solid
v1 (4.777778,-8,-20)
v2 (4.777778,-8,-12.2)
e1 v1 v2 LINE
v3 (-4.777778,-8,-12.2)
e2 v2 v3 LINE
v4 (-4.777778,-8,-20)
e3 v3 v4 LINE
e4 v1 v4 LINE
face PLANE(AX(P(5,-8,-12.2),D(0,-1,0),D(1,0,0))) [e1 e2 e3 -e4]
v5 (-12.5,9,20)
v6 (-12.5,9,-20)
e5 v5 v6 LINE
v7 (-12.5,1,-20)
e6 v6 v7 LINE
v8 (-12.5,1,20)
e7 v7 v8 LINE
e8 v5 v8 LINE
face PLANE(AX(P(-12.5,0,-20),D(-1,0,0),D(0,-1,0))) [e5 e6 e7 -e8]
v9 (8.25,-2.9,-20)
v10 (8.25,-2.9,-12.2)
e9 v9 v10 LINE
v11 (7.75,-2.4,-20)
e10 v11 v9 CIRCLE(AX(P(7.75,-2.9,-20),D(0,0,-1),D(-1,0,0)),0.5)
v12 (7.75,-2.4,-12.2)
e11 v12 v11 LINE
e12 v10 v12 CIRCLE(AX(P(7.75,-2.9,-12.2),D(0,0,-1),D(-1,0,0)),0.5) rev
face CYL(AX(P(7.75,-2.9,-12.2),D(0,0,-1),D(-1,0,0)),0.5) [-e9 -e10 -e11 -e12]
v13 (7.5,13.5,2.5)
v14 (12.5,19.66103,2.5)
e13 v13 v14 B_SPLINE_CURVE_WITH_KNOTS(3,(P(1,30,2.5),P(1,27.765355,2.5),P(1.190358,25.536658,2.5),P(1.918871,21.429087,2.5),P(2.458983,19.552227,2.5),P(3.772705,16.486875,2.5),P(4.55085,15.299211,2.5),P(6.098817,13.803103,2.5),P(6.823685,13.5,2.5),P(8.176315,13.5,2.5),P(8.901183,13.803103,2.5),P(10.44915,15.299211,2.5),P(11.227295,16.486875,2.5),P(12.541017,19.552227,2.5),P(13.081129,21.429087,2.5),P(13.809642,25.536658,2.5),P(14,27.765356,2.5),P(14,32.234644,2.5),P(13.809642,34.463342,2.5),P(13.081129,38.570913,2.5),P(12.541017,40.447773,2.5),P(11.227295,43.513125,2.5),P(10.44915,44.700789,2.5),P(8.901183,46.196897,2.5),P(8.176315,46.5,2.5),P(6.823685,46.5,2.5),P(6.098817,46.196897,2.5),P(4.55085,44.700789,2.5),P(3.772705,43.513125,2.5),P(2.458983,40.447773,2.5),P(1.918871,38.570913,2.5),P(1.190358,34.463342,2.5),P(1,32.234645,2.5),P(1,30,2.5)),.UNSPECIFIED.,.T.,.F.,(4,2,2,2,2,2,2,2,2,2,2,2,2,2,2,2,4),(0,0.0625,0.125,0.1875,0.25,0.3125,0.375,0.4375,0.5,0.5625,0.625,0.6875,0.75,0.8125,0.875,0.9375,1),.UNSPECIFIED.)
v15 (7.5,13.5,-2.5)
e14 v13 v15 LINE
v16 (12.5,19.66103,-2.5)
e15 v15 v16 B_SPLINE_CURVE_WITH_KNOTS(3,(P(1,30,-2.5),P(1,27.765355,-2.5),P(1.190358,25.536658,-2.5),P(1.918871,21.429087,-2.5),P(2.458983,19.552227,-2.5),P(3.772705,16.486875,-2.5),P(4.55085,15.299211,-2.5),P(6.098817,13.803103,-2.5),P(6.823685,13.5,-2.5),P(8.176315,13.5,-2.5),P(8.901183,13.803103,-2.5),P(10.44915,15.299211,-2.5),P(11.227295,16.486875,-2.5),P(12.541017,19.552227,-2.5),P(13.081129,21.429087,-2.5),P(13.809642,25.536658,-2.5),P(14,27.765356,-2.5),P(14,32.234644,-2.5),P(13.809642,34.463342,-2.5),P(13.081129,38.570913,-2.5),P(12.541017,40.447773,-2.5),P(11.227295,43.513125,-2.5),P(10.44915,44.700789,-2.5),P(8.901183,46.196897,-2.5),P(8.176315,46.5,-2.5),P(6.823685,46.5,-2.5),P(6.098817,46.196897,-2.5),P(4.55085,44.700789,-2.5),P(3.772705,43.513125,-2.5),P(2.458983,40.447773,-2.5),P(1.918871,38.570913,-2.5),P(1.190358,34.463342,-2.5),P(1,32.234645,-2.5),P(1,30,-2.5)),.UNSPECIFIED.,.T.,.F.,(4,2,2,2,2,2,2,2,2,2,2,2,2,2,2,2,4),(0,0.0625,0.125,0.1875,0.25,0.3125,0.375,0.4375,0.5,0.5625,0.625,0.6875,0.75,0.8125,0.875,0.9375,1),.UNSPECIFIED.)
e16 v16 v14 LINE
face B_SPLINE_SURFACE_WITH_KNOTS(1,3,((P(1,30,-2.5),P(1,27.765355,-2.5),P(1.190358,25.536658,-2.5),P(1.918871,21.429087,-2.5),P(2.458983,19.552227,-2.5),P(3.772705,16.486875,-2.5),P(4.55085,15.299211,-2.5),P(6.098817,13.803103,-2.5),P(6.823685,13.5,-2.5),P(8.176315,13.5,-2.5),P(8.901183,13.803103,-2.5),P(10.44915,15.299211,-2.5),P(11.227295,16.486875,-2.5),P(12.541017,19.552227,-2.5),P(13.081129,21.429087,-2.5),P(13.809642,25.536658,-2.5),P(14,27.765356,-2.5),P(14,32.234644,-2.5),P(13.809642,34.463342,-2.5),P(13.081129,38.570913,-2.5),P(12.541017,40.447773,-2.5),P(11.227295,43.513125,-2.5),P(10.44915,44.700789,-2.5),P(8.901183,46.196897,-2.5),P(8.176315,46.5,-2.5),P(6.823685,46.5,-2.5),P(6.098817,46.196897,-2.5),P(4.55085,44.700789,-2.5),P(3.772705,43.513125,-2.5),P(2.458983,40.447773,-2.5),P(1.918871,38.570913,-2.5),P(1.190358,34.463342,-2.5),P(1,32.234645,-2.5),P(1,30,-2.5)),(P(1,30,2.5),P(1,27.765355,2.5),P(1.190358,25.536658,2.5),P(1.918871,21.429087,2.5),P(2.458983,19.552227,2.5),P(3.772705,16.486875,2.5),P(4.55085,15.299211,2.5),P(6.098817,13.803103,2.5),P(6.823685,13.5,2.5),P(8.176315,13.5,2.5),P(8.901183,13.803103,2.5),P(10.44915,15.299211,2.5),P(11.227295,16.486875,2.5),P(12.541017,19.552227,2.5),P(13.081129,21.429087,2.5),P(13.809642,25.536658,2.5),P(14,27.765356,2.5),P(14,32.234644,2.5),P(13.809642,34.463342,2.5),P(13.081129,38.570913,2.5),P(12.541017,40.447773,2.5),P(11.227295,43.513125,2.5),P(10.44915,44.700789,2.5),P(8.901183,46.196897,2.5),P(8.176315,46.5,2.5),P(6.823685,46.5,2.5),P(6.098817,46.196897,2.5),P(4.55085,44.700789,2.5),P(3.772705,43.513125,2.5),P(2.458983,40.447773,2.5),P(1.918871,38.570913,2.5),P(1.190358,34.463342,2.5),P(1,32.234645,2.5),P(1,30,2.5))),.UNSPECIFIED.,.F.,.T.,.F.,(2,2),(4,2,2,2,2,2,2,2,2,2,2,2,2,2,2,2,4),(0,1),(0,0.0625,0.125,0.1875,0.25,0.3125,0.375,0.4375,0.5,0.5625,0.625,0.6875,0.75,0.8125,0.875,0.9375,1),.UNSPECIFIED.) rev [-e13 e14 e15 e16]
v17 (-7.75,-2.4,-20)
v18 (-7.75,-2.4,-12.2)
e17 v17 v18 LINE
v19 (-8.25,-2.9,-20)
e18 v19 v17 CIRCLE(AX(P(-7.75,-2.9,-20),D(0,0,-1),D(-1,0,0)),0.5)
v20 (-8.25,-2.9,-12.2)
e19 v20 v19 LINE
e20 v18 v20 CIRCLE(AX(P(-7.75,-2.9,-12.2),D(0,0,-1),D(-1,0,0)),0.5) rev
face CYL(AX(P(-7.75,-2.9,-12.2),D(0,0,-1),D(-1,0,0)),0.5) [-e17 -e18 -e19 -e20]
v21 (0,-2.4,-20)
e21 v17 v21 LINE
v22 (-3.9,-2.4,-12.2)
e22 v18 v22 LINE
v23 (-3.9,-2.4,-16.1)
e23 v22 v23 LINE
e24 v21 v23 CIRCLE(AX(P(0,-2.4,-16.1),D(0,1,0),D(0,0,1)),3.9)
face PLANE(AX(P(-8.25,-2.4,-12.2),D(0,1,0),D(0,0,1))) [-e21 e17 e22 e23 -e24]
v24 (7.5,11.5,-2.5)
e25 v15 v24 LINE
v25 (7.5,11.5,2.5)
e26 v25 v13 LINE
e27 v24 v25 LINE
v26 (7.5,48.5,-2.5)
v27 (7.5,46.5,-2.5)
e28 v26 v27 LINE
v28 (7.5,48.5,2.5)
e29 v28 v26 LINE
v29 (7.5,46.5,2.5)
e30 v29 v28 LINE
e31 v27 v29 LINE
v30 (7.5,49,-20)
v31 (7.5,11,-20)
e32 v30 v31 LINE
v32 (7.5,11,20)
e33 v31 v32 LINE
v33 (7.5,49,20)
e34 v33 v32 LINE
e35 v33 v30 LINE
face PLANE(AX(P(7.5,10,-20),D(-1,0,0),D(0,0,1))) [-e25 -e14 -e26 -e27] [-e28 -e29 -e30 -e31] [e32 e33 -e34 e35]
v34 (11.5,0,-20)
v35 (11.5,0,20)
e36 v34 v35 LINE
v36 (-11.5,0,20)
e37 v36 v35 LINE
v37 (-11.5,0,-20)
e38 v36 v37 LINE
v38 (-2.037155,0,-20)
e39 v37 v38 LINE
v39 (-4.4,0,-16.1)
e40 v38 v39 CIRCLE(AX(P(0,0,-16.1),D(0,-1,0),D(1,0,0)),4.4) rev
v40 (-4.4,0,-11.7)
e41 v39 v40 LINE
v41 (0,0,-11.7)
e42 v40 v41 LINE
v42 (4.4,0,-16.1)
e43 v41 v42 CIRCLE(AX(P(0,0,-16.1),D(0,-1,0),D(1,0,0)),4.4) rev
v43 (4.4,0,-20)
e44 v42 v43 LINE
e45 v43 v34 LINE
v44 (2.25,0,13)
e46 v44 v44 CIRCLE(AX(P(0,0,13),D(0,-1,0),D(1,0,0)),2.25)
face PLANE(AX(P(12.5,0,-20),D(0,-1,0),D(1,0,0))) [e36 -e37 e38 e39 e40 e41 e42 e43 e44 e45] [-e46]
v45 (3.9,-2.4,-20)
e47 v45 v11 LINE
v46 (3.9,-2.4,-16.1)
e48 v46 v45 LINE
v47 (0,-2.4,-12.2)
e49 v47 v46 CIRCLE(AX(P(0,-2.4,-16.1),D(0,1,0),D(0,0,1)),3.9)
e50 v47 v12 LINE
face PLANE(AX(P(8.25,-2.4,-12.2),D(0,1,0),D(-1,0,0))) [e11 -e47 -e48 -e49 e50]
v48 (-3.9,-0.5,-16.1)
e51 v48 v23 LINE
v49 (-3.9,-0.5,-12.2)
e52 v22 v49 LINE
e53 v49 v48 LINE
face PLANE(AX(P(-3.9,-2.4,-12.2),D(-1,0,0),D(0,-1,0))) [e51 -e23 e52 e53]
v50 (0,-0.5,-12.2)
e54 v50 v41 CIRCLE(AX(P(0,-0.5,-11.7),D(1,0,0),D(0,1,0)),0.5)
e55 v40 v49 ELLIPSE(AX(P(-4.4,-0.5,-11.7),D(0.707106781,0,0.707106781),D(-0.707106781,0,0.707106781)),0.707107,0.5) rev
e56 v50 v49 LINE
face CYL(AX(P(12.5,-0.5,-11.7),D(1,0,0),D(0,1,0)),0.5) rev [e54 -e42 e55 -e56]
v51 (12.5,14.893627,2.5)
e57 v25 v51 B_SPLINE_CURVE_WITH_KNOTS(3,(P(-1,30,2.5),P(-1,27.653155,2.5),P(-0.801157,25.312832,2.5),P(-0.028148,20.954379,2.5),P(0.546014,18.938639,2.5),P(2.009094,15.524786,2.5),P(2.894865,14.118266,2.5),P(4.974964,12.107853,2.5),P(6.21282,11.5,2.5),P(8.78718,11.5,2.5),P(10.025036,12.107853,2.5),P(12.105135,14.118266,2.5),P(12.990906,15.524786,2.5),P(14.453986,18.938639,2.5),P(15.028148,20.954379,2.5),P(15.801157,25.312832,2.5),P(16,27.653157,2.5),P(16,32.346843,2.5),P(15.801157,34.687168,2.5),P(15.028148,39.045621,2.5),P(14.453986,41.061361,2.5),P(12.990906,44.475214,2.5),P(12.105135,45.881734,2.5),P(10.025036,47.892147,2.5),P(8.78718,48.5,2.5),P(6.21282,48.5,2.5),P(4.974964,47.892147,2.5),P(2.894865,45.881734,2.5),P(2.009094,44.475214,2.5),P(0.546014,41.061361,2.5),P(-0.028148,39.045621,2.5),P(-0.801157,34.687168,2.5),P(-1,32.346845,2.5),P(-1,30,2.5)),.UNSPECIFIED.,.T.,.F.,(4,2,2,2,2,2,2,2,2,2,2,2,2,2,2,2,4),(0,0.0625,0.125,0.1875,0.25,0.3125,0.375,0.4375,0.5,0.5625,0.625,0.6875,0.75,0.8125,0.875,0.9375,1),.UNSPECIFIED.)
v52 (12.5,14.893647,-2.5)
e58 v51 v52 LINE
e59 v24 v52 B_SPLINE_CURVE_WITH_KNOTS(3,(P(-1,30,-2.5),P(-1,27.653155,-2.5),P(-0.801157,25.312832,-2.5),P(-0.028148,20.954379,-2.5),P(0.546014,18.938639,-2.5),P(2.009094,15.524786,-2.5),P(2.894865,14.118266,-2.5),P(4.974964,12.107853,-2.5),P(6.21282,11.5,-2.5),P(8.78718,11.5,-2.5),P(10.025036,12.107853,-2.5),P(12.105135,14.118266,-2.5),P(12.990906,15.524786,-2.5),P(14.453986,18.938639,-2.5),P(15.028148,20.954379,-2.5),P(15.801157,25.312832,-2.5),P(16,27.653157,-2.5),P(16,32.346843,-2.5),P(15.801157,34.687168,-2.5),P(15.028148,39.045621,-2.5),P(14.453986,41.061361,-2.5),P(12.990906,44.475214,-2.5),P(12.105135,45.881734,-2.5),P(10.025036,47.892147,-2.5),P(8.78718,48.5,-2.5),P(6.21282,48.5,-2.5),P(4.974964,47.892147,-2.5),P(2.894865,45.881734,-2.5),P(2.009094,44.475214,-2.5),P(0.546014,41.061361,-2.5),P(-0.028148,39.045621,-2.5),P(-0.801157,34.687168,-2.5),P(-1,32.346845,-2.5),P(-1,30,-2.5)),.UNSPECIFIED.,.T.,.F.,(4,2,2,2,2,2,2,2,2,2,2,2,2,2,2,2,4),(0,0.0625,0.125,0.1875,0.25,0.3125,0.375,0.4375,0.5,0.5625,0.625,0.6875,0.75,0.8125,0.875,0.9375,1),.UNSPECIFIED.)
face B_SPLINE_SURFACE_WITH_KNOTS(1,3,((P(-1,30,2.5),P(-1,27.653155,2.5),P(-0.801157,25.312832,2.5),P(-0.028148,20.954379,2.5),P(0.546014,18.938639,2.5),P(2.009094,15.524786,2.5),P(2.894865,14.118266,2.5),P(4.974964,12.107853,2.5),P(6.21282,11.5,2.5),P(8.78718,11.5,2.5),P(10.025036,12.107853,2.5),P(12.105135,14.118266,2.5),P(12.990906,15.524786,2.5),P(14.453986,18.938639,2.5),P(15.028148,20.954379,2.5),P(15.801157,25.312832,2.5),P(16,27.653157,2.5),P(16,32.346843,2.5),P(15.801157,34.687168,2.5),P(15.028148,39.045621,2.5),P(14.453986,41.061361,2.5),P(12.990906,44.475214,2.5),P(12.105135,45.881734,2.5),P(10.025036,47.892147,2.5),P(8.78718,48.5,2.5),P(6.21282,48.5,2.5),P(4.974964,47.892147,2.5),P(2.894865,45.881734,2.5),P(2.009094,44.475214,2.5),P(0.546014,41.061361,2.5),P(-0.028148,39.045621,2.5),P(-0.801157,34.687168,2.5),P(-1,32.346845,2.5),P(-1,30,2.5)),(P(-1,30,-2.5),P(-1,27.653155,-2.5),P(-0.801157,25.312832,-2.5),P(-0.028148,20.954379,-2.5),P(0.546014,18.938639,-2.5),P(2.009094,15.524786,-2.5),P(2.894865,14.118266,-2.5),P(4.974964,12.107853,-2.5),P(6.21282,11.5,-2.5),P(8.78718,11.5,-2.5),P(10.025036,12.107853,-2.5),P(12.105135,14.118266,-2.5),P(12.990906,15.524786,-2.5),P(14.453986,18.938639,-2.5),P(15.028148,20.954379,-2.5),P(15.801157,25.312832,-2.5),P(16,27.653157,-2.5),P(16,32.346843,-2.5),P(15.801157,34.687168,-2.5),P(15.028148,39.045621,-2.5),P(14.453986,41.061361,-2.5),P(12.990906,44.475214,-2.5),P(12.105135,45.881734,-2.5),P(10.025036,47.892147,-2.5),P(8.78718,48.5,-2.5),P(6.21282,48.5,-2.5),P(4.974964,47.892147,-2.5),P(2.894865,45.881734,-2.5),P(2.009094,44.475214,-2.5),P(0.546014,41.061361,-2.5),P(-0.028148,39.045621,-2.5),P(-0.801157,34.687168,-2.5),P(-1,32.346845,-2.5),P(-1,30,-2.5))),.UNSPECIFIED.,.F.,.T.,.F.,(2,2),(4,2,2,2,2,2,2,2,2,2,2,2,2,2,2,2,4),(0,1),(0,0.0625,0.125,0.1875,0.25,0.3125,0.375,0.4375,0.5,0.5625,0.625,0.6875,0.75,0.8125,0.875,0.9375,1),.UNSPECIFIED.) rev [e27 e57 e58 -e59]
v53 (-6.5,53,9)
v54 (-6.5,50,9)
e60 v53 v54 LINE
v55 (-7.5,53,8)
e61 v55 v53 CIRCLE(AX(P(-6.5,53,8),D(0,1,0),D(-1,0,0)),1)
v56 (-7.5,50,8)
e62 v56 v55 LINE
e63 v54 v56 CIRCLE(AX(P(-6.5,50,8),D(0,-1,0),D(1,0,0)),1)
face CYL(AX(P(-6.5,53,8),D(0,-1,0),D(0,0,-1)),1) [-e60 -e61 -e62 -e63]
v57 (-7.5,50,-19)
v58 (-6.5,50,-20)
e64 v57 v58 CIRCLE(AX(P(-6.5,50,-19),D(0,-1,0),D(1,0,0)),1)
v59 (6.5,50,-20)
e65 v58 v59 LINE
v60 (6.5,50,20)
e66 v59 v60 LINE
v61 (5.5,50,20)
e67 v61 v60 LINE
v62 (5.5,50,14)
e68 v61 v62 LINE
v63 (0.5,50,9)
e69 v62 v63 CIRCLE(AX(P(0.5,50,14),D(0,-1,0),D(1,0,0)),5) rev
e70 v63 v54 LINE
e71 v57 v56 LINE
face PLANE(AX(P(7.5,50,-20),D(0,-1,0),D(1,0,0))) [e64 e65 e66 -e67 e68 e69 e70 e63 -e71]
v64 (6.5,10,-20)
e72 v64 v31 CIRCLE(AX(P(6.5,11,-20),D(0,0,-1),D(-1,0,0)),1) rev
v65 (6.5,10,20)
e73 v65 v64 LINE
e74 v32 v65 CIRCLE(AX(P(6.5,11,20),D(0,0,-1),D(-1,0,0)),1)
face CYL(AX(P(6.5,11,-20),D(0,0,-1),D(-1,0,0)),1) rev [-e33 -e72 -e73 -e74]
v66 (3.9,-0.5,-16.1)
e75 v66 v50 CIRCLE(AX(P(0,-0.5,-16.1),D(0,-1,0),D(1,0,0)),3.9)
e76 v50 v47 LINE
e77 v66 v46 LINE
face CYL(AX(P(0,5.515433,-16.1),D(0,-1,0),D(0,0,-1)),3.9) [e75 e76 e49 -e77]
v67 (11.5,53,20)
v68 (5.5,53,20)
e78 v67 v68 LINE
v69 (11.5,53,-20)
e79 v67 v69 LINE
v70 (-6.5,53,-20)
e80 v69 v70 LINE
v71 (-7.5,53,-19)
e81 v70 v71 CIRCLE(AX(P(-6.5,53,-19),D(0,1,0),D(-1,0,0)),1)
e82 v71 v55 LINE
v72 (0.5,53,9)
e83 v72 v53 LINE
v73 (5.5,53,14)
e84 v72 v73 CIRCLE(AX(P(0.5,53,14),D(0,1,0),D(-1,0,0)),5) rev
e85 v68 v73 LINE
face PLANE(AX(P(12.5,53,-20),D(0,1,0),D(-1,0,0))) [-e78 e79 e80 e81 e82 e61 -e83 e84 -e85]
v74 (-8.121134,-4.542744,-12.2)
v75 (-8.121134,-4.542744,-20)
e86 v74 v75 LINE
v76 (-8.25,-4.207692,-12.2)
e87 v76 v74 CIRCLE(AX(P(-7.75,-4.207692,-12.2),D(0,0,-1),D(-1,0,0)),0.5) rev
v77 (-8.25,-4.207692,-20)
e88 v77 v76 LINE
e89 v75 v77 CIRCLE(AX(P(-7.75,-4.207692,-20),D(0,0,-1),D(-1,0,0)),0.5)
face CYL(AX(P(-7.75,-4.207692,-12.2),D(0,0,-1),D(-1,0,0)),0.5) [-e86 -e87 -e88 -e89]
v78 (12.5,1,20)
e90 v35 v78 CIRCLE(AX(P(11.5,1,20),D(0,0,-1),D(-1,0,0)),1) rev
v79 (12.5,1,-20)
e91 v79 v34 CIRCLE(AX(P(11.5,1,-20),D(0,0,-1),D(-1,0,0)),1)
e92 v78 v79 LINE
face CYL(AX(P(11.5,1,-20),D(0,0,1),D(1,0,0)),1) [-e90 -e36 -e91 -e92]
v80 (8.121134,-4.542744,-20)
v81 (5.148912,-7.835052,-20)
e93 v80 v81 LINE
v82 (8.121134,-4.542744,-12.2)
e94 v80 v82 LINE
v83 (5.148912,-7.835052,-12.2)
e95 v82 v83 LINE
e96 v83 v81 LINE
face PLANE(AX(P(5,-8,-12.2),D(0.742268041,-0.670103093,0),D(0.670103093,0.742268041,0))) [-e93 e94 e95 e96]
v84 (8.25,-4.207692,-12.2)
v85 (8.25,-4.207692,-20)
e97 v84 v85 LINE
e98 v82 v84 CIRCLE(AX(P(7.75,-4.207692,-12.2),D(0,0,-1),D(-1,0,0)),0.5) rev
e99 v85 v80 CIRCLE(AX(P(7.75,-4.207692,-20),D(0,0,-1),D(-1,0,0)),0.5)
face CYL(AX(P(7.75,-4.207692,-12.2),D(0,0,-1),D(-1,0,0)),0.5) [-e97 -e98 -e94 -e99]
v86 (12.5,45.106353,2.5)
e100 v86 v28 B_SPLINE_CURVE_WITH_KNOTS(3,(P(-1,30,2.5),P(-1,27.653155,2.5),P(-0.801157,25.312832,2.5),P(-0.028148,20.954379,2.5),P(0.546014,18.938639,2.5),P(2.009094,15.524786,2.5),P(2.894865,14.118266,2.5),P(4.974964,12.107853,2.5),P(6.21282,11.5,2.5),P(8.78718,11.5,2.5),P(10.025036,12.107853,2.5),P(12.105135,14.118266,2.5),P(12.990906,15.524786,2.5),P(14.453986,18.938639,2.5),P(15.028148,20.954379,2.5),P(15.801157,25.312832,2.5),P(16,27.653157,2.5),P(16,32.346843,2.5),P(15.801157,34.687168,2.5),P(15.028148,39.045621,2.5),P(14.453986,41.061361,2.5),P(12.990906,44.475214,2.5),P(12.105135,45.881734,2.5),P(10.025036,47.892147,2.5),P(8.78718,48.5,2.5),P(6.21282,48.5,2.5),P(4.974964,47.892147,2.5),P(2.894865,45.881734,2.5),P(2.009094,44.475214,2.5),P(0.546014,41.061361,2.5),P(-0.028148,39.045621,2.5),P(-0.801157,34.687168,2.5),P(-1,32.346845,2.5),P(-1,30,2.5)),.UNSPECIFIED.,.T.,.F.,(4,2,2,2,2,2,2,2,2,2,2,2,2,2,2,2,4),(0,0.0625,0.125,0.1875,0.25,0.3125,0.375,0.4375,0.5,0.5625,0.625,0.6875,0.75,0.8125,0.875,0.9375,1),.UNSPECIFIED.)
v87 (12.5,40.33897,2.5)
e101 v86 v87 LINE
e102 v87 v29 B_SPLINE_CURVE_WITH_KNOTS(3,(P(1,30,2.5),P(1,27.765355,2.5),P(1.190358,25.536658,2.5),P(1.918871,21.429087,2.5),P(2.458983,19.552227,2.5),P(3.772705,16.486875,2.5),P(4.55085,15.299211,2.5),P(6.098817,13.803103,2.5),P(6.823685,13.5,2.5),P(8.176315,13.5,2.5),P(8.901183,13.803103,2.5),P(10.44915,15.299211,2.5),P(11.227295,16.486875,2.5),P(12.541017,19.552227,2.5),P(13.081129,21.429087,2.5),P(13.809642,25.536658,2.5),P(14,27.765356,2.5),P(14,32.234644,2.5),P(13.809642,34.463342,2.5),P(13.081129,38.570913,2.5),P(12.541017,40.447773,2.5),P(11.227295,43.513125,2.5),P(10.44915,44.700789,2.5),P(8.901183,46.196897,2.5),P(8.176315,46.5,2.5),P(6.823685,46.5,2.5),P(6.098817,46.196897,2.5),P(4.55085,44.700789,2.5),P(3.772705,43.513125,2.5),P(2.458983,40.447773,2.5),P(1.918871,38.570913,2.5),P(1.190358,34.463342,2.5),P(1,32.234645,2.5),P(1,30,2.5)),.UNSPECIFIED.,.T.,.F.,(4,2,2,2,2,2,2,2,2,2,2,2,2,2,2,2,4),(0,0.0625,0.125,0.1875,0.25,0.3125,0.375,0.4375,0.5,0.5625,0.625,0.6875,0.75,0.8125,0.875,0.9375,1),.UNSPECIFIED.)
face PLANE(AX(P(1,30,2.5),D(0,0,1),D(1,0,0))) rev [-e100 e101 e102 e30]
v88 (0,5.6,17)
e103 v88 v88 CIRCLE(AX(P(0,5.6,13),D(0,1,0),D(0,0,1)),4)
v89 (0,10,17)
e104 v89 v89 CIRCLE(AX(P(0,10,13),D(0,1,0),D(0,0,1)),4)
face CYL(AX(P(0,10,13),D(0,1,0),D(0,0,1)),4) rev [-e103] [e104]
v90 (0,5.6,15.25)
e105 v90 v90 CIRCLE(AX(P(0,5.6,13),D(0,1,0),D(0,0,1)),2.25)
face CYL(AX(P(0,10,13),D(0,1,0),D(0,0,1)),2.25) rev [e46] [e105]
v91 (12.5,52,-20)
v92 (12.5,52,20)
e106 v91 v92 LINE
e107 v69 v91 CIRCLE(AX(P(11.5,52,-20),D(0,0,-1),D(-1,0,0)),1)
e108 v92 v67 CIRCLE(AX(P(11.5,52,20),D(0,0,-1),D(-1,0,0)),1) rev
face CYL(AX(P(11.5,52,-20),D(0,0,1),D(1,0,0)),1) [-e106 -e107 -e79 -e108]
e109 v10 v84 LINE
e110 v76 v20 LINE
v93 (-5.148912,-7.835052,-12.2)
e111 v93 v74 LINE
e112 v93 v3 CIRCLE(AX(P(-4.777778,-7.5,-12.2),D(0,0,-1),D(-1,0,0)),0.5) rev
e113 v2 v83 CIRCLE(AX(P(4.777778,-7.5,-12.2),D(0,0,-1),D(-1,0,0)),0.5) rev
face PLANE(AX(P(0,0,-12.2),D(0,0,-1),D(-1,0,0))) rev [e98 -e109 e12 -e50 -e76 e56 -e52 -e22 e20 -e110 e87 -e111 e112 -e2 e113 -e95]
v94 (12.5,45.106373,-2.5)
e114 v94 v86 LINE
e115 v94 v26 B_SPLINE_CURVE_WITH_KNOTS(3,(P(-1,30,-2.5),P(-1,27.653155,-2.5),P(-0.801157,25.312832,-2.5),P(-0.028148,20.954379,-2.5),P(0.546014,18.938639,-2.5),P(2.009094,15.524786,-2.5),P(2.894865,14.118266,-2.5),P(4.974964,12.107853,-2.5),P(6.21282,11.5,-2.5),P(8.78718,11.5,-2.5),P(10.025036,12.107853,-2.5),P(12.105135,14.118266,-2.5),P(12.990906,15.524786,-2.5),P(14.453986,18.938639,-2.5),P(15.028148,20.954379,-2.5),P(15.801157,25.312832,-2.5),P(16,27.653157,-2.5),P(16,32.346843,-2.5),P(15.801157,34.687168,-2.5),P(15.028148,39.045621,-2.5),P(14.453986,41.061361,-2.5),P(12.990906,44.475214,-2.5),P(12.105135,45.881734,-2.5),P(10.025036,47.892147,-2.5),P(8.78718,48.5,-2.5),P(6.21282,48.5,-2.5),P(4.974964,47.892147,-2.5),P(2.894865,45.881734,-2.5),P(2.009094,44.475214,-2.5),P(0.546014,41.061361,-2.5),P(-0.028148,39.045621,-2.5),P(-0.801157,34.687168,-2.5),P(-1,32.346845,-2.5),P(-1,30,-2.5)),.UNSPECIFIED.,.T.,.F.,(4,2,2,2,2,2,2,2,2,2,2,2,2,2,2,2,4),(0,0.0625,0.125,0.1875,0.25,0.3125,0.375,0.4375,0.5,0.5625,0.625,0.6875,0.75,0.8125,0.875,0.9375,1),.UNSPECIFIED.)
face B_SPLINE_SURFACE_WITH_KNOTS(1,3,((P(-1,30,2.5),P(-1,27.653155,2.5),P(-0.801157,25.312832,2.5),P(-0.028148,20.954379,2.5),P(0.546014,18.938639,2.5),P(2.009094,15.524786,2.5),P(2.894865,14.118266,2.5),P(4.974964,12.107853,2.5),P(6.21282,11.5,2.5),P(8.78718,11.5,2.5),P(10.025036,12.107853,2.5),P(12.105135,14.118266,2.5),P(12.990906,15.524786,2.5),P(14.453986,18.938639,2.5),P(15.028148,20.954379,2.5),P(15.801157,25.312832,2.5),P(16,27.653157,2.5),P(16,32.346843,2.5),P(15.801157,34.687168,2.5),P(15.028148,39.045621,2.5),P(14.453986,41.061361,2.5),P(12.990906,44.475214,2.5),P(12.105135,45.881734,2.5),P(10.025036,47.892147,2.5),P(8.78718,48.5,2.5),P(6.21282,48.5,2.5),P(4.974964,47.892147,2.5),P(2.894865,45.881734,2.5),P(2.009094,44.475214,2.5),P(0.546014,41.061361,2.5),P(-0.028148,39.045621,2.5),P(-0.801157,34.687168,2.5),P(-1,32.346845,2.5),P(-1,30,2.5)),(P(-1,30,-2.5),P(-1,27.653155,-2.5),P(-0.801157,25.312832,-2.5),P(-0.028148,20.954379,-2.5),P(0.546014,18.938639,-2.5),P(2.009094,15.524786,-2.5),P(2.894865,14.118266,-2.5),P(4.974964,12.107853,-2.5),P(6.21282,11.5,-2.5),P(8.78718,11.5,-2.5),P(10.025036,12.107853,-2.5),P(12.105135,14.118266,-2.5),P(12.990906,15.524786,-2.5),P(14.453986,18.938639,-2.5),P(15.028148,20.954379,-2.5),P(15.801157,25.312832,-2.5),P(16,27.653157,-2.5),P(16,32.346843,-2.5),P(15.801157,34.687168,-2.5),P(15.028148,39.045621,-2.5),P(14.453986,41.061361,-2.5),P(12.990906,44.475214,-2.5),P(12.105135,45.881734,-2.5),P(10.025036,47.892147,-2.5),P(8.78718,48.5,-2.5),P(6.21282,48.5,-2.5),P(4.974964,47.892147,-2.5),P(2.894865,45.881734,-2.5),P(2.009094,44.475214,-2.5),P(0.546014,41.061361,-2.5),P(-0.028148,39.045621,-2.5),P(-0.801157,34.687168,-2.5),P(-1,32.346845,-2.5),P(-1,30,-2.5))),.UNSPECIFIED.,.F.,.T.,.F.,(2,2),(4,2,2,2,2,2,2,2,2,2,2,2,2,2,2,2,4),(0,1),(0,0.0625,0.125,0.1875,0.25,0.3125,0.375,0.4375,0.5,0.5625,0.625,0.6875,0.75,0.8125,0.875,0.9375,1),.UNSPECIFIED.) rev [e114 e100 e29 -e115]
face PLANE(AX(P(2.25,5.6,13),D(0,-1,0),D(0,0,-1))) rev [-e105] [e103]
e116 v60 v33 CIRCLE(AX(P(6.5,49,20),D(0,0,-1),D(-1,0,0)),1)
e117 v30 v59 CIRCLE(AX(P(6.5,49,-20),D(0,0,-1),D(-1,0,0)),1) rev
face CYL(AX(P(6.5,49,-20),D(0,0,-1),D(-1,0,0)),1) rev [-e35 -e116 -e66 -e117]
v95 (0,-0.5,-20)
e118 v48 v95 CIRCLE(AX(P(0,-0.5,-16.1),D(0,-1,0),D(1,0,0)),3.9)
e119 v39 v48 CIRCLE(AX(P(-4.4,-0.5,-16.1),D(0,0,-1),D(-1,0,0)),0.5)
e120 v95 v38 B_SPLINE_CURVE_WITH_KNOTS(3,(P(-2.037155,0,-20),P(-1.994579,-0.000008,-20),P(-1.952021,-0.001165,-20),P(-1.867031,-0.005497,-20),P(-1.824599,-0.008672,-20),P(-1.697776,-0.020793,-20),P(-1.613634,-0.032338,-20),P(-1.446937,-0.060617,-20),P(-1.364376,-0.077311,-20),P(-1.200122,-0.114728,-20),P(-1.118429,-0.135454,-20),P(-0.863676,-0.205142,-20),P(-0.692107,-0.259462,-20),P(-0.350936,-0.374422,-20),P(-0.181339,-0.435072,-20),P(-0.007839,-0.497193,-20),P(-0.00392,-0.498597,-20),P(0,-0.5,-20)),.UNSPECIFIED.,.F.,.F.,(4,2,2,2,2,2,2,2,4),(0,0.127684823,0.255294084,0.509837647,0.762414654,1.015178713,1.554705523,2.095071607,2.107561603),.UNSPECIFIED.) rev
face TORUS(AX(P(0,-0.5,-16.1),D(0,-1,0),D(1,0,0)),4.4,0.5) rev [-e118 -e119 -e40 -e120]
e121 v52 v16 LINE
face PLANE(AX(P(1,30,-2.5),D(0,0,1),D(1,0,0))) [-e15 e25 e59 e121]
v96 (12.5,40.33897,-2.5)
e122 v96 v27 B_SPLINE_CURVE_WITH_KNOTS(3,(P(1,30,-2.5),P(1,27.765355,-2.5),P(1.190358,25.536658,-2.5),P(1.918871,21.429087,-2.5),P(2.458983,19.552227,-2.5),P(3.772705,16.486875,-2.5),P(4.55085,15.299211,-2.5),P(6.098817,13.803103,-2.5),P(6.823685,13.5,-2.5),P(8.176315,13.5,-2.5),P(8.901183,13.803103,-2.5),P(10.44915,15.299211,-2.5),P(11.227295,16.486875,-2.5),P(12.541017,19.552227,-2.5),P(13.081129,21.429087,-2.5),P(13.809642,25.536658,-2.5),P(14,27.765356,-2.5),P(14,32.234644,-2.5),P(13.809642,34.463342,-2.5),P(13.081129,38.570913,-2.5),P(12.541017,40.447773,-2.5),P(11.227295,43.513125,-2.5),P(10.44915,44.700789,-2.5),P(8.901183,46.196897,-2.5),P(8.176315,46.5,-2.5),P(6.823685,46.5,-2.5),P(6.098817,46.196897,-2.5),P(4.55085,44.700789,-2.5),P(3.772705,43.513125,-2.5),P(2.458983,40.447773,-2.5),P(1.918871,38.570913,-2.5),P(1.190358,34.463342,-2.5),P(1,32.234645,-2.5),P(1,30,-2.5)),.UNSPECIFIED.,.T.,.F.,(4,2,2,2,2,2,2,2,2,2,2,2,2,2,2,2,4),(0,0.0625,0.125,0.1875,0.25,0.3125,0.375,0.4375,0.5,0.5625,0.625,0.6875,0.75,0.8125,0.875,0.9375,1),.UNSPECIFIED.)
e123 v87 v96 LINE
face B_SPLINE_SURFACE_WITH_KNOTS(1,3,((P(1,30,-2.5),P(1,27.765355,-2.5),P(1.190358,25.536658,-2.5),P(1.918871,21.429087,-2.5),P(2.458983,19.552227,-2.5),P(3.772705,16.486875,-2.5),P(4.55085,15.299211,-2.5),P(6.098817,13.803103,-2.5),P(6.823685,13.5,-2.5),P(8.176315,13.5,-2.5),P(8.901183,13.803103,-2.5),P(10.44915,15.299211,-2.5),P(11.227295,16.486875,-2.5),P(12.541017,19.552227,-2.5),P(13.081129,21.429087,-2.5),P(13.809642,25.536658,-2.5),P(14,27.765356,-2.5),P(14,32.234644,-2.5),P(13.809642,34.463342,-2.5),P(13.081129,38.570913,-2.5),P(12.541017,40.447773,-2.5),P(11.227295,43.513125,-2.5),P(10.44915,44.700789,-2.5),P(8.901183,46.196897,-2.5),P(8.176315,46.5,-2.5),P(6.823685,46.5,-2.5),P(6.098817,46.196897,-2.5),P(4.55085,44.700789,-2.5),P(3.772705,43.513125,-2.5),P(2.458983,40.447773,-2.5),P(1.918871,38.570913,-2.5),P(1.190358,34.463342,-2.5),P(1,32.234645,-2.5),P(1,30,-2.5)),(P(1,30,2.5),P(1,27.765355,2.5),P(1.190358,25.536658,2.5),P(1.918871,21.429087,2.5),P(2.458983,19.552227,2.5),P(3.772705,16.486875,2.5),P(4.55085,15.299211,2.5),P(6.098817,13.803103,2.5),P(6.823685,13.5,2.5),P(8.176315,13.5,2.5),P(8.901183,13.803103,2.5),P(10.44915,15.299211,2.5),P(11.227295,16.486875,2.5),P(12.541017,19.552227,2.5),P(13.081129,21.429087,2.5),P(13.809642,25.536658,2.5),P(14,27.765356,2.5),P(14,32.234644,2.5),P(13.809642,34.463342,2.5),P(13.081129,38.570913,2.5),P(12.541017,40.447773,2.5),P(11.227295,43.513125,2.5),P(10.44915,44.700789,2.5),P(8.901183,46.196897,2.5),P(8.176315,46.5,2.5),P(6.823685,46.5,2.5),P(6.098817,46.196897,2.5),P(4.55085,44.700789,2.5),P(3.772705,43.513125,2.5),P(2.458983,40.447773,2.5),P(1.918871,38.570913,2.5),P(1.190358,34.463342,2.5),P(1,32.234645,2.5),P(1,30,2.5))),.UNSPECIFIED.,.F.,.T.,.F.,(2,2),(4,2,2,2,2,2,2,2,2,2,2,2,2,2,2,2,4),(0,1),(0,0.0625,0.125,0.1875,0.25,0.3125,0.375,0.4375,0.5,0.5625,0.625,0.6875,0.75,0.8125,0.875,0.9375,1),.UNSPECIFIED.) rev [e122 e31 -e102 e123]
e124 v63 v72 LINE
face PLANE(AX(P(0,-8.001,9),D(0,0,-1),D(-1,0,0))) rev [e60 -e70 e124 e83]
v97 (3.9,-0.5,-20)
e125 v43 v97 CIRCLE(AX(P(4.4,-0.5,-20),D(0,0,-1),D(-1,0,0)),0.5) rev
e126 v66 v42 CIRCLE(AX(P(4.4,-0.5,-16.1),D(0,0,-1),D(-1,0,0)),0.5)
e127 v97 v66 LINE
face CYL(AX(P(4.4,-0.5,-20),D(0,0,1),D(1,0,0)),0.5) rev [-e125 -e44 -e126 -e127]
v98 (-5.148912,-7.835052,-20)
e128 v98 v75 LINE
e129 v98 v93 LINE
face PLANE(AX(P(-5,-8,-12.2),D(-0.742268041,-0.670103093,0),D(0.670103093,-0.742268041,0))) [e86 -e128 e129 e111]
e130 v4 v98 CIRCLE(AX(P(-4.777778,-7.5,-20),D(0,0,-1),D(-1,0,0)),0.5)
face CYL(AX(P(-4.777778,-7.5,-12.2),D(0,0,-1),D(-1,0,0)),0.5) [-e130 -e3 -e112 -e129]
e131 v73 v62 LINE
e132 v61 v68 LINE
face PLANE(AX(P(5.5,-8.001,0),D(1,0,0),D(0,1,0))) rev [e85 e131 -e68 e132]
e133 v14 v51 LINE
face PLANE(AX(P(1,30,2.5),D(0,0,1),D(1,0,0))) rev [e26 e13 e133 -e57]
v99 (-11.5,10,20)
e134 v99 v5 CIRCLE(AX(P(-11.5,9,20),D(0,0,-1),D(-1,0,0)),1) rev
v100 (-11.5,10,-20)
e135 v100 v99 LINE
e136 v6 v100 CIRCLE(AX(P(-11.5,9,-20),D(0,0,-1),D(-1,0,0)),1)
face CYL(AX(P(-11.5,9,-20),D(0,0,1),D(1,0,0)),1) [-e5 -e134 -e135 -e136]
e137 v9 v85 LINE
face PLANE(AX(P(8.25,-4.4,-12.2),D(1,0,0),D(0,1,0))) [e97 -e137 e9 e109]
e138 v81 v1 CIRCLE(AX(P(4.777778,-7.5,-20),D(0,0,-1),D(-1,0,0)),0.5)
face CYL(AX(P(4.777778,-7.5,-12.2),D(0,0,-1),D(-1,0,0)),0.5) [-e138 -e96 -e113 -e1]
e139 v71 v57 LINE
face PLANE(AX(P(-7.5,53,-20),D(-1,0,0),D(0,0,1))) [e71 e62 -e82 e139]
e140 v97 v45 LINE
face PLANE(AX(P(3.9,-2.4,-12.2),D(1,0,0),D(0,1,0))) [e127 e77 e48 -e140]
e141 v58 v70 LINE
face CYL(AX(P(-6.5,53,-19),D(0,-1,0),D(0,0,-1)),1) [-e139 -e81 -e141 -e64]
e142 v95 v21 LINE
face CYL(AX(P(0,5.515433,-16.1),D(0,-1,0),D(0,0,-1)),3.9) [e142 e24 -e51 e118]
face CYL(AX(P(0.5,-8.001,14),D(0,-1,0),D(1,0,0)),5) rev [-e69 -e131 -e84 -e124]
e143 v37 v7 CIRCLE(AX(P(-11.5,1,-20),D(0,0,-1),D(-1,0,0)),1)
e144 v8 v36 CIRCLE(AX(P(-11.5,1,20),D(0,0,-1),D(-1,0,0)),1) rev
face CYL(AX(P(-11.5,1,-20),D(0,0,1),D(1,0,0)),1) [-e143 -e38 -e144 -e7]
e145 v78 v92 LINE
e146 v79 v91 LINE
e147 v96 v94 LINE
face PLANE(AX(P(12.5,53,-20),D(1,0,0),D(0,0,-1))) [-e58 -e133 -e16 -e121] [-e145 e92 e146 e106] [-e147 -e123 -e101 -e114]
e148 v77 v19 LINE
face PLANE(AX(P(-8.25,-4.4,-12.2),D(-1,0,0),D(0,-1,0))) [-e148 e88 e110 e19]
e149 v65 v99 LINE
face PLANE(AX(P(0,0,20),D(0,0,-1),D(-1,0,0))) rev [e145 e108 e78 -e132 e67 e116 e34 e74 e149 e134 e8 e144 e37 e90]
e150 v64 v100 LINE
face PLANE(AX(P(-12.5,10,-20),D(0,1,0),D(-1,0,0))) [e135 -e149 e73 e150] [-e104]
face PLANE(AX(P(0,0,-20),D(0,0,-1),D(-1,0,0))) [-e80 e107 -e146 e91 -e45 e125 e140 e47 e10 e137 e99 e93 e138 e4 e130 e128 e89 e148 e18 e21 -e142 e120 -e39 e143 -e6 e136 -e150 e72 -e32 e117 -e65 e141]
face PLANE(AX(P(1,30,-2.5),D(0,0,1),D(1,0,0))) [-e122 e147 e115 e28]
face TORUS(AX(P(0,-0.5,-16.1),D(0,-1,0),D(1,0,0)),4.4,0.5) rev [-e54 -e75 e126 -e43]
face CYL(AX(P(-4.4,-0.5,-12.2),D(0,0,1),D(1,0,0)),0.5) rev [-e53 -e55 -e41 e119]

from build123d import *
from OCP.BRepFilletAPI import BRepFilletAPI_MakeFillet

# Parameters (mm, degrees)
BOSS_EXTRUDE1_DEPTH                                 = 20
CBORE_FOR_M4_HEX_SOCKET_HEAD_CAP_SCREW1_D           = 4.5
CBORE_FOR_M4_HEX_SOCKET_HEAD_CAP_SCREW1_DEPTH       = 10
CBORE_FOR_M4_HEX_SOCKET_HEAD_CAP_SCREW1_CBORE_D     = 8
CBORE_FOR_M4_HEX_SOCKET_HEAD_CAP_SCREW1_CBORE_DEPTH = 4.4
BOSS_EXTRUDE3_DEPTH                                 = 7.8
CUT_EXTRUDE1_DEPTH                                  = 2.4
FILLET3_R                                           = 0.5
CUT_SWEEP1_START                                    = -2.5
CUT_SWEEP1_DEPTH                                    = 5
CUT_EXTRUDE2_REACH                                  = 67.401
SKETCH14_R                                          = 4
FILLET4_R1                                          = 1
FILLET4_R2                                          = 5


# Read off the part's stored shape, not the designer's step: Cut-Sweep1
with BuildPart() as part:
    # Sketch1 → Boss-Extrude1 (new, symmetric)
    with BuildSketch(Plane.XY):
        Polygon((-12.5, 10), (7.5, 10), (7.5, 50), (-7.5, 50), (-7.5, 53), (12.5, 53), (12.5, 0), (-12.5, 0), align=None)
    extrude(amount=BOSS_EXTRUDE1_DEPTH, both=True)

    # CBORE for M4 Hex Socket Head Cap Screw1
    with Locations(Plane(origin=(0, 10, 0), x_dir=(1, 0, 0), z_dir=(0, 1, 0))):
        with Locations((0, -13)):
            CounterBoreHole(CBORE_FOR_M4_HEX_SOCKET_HEAD_CAP_SCREW1_D / 2, CBORE_FOR_M4_HEX_SOCKET_HEAD_CAP_SCREW1_CBORE_D / 2, CBORE_FOR_M4_HEX_SOCKET_HEAD_CAP_SCREW1_CBORE_DEPTH, depth=CBORE_FOR_M4_HEX_SOCKET_HEAD_CAP_SCREW1_DEPTH)

    # Sketch5 → Boss-Extrude3 (add)
    with BuildSketch(Plane(origin=(0, 0, -20), x_dir=(-1, 0, 0), z_dir=(0, 0, -1))):
        Polygon((-5, -8), (5, -8), (8.25, -4.4), (8.25, -2.4), (3.9, -2.4), (3.9, 0), (-3.9, 0), (-3.9, -2.4), (-8.25, -2.4), (-8.25, -4.4), align=None)
    extrude(amount=-BOSS_EXTRUDE3_DEPTH)

    # Sketch6 → Cut-Extrude1 (cut)
    with BuildSketch(Plane(origin=(0, -2.4, 0), x_dir=(1, 0, 0), z_dir=(0, 1, 0))):
        with BuildLine():
            ThreePointArc((-3.9, 16.1), (-2.757716447, 18.857716447), (0, 20))
            Line((0, 20), (-3.9, 20))
            Line((-3.9, 20), (-3.9, 16.1))
        make_face()
        with BuildLine():
            Line((3.9, 12.2), (3.9, 16.1))
            ThreePointArc((3.9, 16.1), (2.757716447, 13.342283553), (0, 12.2))
            Line((0, 12.2), (3.9, 12.2))
        make_face()
    extrude(amount=CUT_EXTRUDE1_DEPTH, mode=Mode.SUBTRACT)

    # Fillet3
    fillet3_edges = [part.edges().sort_by_distance(p)[0] for p in [
        (3.9, 0, -18.05),
        (2.757716447, 0, -13.342283553),
        (-1.95, 0, -12.2),
    ]]
    fillet(fillet3_edges, radius=FILLET3_R)
    fillet3_2_edges = [part.edges().sort_by_distance(p)[0] for p in [
        (-3.9, 0, -14.15),
        (-2.757716447, 0, -18.857716447),
    ]]
    fillet(fillet3_2_edges, radius=FILLET3_R)
    fillet3_3_edges = [part.edges().sort_by_distance(p)[0] for p in [
        (-8.25, -2.4, -16.1),
    ]]
    fillet(fillet3_3_edges, radius=FILLET3_R)
    fillet3_4_edges = [part.edges().sort_by_distance(p)[0] for p in [
        (-8.25, -4.4, -16.1),
    ]]
    fillet(fillet3_4_edges, radius=FILLET3_R)
    fillet3_5_edges = [part.edges().sort_by_distance(p)[0] for p in [
        (-5, -8, -16.1),
    ]]
    fillet(fillet3_5_edges, radius=FILLET3_R)
    fillet3_6_edges = [part.edges().sort_by_distance(p)[0] for p in [
        (5, -8, -16.1),
    ]]
    fillet(fillet3_6_edges, radius=FILLET3_R)
    fillet3_7_edges = [part.edges().sort_by_distance(p)[0] for p in [
        (8.25, -4.4, -16.1),
    ]]
    fillet(fillet3_7_edges, radius=FILLET3_R)
    fillet3_8_edges = [part.edges().sort_by_distance(p)[0] for p in [
        (8.25, -2.4, -16.1),
    ]]
    fillet(fillet3_8_edges, radius=FILLET3_R)

    # Cut-Sweep1 outline → Cut-Sweep1 (cut)
    with BuildSketch(Plane.XY.offset(CUT_SWEEP1_START)):
        with BuildLine():
            Line((12.500000017, 40.338970285), (12.5, 45.105483834))
            add(Edge.make_bspline(
                [(12.5, 45.105483834), (12.059714128, 45.789978249), (11.581411154, 46.38791258), (10.025035585, 47.892146935), (8.787180136, 48.5), (7.5, 48.5)],
                knots=[0.656472281, 0.656472281, 0.656472281, 0.656472281, 0.6875, 0.6875, 0.75, 0.75, 0.75, 0.75], degree=3))
            Line((7.5, 48.5), (7.5, 46.5))
            add(Edge.make_bspline(
                [(12.500000017, 40.338970285), (12.309154865, 40.920252732), (12.103143429, 41.469478304), (11.227294674, 43.513125401), (10.449149583, 44.700789342), (8.901182872, 46.196896563), (8.176315005, 46.5), (7.5, 46.5)],
                knots=[0.604163443, 0.604163443, 0.604163443, 0.604163443, 0.625, 0.625, 0.6875, 0.6875, 0.75, 0.75, 0.75, 0.75], degree=3))
        make_face()
        with BuildLine():
            Line((12.5, 14.894516166), (12.500000017, 19.661029715))
            add(Edge.make_bspline(
                [(7.5, 13.5), (8.176315005, 13.5), (8.901182872, 13.803103437), (10.449149583, 15.299210658), (11.227294674, 16.486874599), (12.103143429, 18.530521696), (12.309154865, 19.079747268), (12.500000017, 19.661029715)],
                knots=[0.25, 0.25, 0.25, 0.25, 0.3125, 0.3125, 0.375, 0.375, 0.395836557, 0.395836557, 0.395836557, 0.395836557], degree=3))
            Line((7.5, 13.5), (7.5, 11.5))
            add(Edge.make_bspline(
                [(7.5, 11.5), (8.787180136, 11.5), (10.025035585, 12.107853065), (11.581411154, 13.61208742), (12.059714128, 14.210021751), (12.5, 14.894516166)],
                knots=[0.25, 0.25, 0.25, 0.25, 0.3125, 0.3125, 0.343527719, 0.343527719, 0.343527719, 0.343527719], degree=3))
        make_face()
    extrude(amount=CUT_SWEEP1_DEPTH, mode=Mode.SUBTRACT)

    # Sketch14 → Cut-Extrude2 (cut, up to next)
    with BuildSketch(Plane(origin=(0, 53, 0), x_dir=(1, 0, 0), z_dir=(0, 1, 0)), mode=Mode.PRIVATE) as cut_extrude2_sk1:
        Polygon((-7.5, -20), (5.5, -20), (5.5, -9), (0, -9), (-7.5, -9), align=None)
        with BuildLine():
            ThreePointArc((4, -13), (-2.828427125, -15.828427125), (0, -9))
            ThreePointArc((0, -9), (2.828427125, -10.171572875), (4, -13))
        make_face(mode=Mode.SUBTRACT)
    cut_extrude2_tool1 = extrude(cut_extrude2_sk1.sketch, amount=-CUT_EXTRUDE2_REACH, mode=Mode.PRIVATE) & part.part
    # Sketch14 → Cut-Extrude2 (cut, up to next)
    with BuildSketch(Plane(origin=(0, 53, 0), x_dir=(1, 0, 0), z_dir=(0, 1, 0)), mode=Mode.PRIVATE) as cut_extrude2_sk2:
        with Locations(Location((0, -13, 0), (0, 0, 270))):
            Circle(SKETCH14_R)
    cut_extrude2_tool2 = extrude(cut_extrude2_sk2.sketch, amount=-CUT_EXTRUDE2_REACH, mode=Mode.PRIVATE) & part.part
    add(cut_extrude2_tool1.solids().sort_by_distance((-1, 53, 19.829706))[0], mode=Mode.SUBTRACT)
    add(cut_extrude2_tool2.solids().sort_by_distance((0, 53, 13))[0], mode=Mode.SUBTRACT)

    # Fillet4: one fillet with a radius per group of edges: ONE call of the kernel's fillet builder (fillet() takes one radius for all edges)
    fillet4_edges_1 = [part.edges().sort_by_distance(p)[0] for p in [
        (-12.5, 10, 0),
        (7.5, 10, 0),
        (7.5, 50, 0),
        (12.5, 53, 0),
        (12.5, 0, 0),
        (-12.5, 0, 0),
        (-7.5, 51.5, 9),
        (-7.5, 51.5, -20),
    ]]
    fillet4_edges_2 = [part.edges().sort_by_distance(p)[0] for p in [
        (5.5, 51.5, 9),
    ]]
    fillet4 = BRepFilletAPI_MakeFillet(part.part.solid().wrapped)
    for e in fillet4_edges_1:
        fillet4.Add(FILLET4_R1, e.wrapped)
    for e in fillet4_edges_2:
        fillet4.Add(FILLET4_R2, e.wrapped)
    add(Compound.cast(fillet4.Shape()), mode=Mode.REPLACE)


solid = part.part
